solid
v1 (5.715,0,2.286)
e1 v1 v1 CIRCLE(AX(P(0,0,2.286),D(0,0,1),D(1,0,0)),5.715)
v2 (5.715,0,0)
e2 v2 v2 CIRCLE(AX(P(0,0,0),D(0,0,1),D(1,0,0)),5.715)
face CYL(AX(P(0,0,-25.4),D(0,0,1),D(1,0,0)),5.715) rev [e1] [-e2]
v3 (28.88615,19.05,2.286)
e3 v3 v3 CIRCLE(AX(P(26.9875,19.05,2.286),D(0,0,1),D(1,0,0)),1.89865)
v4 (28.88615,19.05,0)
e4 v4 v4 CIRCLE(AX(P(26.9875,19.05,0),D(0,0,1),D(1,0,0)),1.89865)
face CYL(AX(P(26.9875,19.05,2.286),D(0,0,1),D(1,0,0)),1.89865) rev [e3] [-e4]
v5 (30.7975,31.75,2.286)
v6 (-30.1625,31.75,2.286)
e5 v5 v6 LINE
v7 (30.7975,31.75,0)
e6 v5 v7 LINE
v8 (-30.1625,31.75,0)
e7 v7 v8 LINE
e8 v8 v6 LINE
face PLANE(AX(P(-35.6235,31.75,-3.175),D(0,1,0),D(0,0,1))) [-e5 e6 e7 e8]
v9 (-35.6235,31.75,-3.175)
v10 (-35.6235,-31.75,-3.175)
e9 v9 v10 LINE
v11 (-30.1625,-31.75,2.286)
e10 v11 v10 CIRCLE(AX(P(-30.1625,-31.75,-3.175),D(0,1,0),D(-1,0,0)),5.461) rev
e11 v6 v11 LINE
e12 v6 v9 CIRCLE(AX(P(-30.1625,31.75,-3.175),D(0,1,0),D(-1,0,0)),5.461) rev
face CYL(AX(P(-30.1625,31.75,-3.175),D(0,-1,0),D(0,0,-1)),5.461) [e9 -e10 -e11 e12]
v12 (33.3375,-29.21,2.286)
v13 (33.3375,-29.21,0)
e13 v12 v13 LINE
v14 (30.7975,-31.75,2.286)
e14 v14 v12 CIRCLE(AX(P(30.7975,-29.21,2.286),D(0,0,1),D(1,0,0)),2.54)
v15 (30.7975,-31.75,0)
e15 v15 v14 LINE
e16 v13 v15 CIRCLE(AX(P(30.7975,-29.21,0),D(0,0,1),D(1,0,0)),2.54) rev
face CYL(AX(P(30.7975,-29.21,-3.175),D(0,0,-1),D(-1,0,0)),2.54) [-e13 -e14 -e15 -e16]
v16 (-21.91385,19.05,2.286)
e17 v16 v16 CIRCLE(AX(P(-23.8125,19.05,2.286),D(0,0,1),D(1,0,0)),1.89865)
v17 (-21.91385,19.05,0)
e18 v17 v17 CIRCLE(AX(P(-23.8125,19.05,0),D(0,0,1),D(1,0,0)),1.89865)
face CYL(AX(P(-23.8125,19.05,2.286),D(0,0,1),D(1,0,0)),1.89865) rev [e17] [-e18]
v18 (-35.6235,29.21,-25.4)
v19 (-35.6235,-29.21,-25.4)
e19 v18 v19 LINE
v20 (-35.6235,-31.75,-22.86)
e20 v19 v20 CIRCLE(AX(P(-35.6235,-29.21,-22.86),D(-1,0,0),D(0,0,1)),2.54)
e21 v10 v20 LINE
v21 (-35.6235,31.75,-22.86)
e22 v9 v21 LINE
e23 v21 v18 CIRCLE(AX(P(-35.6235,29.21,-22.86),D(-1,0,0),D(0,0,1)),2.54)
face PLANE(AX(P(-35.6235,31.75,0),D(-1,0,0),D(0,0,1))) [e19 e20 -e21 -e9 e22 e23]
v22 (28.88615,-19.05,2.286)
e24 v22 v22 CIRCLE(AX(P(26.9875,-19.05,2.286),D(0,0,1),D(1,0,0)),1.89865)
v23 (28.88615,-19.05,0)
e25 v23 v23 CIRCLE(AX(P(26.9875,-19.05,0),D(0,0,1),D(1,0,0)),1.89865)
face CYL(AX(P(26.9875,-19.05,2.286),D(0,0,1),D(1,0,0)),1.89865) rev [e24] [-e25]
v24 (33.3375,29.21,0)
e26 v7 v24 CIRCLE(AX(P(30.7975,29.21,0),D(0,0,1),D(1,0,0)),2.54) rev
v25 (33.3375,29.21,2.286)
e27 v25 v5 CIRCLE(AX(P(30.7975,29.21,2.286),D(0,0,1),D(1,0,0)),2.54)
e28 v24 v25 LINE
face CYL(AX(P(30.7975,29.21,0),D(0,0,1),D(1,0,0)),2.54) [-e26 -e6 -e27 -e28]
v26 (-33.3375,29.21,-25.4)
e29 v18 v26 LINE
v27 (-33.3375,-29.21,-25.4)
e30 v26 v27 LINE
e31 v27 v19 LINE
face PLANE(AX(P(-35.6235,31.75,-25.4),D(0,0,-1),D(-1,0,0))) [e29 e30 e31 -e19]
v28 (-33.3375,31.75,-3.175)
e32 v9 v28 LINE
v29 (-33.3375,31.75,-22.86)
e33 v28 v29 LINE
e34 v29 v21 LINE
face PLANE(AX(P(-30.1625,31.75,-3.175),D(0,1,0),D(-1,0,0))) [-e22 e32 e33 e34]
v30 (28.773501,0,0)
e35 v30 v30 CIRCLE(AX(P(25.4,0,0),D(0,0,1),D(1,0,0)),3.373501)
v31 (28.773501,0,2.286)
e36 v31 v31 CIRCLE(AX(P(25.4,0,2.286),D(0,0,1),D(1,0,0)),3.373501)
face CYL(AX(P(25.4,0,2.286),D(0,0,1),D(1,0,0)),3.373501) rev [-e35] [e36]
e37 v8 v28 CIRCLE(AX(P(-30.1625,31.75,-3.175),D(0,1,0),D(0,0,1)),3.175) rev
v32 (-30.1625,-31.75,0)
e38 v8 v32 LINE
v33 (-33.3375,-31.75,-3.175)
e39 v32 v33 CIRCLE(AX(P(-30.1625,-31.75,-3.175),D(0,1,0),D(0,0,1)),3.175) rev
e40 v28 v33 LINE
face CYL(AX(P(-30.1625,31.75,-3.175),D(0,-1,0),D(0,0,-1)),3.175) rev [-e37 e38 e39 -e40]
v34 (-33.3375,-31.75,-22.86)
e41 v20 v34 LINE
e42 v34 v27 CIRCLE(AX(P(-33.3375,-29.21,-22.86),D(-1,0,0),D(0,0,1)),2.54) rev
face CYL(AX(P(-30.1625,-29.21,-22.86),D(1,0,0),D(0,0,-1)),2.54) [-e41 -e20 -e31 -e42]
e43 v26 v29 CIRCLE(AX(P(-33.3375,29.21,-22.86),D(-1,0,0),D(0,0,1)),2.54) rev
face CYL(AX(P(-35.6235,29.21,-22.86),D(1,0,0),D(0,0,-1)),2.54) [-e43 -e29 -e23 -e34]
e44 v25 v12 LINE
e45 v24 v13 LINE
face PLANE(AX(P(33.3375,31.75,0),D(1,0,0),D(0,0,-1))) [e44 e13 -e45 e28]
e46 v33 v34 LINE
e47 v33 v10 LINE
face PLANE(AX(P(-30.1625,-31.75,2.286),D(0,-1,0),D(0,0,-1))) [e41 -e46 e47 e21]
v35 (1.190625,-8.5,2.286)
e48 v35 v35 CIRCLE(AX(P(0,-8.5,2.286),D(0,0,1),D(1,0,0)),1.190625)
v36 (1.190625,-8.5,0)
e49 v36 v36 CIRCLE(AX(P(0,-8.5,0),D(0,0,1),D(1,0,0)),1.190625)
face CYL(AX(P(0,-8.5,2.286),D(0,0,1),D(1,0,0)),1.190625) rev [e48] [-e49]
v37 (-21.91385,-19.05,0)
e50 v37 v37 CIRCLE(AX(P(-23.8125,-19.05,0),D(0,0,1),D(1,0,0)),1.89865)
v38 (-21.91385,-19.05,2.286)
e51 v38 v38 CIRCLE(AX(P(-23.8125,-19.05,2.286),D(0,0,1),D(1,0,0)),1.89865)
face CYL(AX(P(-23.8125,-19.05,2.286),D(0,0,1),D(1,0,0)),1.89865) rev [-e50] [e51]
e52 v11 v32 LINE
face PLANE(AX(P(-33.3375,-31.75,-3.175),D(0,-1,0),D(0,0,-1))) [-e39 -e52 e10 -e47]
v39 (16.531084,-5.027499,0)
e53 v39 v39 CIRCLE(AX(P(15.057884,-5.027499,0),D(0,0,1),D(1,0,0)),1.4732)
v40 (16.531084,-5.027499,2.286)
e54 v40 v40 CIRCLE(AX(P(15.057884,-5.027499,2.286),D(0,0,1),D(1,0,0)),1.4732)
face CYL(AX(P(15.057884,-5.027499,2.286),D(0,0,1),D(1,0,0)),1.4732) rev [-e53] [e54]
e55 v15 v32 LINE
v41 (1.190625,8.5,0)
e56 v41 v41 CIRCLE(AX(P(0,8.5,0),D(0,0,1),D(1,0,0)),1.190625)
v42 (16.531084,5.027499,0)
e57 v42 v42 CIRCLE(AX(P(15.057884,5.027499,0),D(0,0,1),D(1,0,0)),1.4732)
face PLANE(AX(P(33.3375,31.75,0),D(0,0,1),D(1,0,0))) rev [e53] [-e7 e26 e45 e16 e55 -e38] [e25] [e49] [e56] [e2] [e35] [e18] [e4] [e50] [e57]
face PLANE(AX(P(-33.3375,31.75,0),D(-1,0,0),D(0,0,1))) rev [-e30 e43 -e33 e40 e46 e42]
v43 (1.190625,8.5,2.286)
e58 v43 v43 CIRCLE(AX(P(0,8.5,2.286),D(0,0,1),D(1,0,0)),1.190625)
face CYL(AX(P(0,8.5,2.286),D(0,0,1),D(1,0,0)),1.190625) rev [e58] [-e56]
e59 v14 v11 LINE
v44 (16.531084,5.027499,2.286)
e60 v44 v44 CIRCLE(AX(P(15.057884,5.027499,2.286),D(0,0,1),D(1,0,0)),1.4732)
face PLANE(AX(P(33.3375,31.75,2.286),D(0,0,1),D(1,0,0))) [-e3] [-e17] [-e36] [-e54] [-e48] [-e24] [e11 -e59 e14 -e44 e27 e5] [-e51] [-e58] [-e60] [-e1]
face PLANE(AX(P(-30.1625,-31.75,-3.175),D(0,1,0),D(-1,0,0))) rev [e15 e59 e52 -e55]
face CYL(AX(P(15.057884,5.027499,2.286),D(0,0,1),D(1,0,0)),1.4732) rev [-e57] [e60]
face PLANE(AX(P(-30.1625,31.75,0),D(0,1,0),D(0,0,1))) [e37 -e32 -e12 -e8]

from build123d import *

# Parameters (mm, degrees)
BASE_FLANGE1_DEPTH               = 31.75
FILLET1_R                        = 2.54
F_25_0_1495_DIAMETER_HOLE1_D     = 3.7973
SKETCH10_R                       = 5.715
CUT_EXTRUDE1_DEPTH               = 56.168930099
F_17_64_0_26563_DIAMETER_HOLE1_D = 6.747002
F_3_32_0_09375_DIAMETER_HOLE1_D  = 2.38125
F_32_0_116_DIAMETER_HOLE1_D      = 2.9464


# Sheet-metal steps are written as plain solids
with BuildPart() as part:
    # Sketch3 → Base-Flange1 (new, symmetric)
    with BuildSketch(Plane(origin=(0, 0, 0), x_dir=(-1, 0, 0), z_dir=(0, 1, 0))):
        with BuildLine():
            Line((-33.3375, 0), (30.1625, 0))
            ThreePointArc((30.1625, 0), (32.40756403, -0.92993597), (33.3375, -3.175))
            Line((33.3375, -3.175), (33.3375, -25.4))
            Line((33.3375, -25.4), (35.6235, -25.4))
            Line((35.6235, -25.4), (35.6235, -3.175))
            ThreePointArc((35.6235, -3.175), (34.024010132, 0.686510132), (30.1625, 2.286))
            Line((30.1625, 2.286), (-33.3375, 2.286))
            Line((-33.3375, 2.286), (-33.3375, 0))
        make_face()
    extrude(amount=BASE_FLANGE1_DEPTH, both=True)

    # Fillet1
    fillet1_edges = [part.edges().sort_by_distance(p)[0] for p in [
        (33.3375, 31.75, 1.143),
        (33.3375, -31.75, 1.143),
        (-34.4805, 31.75, -25.4),
        (-34.4805, -31.75, -25.4),
    ]]
    fillet(fillet1_edges, radius=FILLET1_R)

    # #25 (0.1495) Diameter Hole1 (through all)
    with Locations(Plane.XY.offset(2.286)):
        with Locations((-23.8125, 19.05), (26.9875, 19.05), (26.9875, -19.05), (-23.8125, -19.05)):
            Hole(F_25_0_1495_DIAMETER_HOLE1_D / 2)

    # Sketch10 → Cut-Extrude1 (cut, through all)
    with BuildSketch(Plane.XY.offset(2.286)):
        Circle(SKETCH10_R)
    extrude(amount=-CUT_EXTRUDE1_DEPTH, mode=Mode.SUBTRACT)

    # 17/64 (0.26563) Diameter Hole1 (through all)
    with Locations(Plane.XY.offset(2.286)):
        with Locations((25.4, 0)):
            Hole(F_17_64_0_26563_DIAMETER_HOLE1_D / 2)

    # 3/32 (0.09375) Diameter Hole1 (through all)
    with Locations(Plane.XY.offset(2.286)):
        with Locations((0, 8.5), (0, -8.5)):
            Hole(F_3_32_0_09375_DIAMETER_HOLE1_D / 2)

    # #32 (0.116) Diameter Hole1 (through all)
    with Locations(Plane.XY.offset(2.286)):
        with Locations((15.057884182, 5.027499276), (15.057884182, -5.027499276)):
            Hole(F_32_0_116_DIAMETER_HOLE1_D / 2)


solid = part.part
